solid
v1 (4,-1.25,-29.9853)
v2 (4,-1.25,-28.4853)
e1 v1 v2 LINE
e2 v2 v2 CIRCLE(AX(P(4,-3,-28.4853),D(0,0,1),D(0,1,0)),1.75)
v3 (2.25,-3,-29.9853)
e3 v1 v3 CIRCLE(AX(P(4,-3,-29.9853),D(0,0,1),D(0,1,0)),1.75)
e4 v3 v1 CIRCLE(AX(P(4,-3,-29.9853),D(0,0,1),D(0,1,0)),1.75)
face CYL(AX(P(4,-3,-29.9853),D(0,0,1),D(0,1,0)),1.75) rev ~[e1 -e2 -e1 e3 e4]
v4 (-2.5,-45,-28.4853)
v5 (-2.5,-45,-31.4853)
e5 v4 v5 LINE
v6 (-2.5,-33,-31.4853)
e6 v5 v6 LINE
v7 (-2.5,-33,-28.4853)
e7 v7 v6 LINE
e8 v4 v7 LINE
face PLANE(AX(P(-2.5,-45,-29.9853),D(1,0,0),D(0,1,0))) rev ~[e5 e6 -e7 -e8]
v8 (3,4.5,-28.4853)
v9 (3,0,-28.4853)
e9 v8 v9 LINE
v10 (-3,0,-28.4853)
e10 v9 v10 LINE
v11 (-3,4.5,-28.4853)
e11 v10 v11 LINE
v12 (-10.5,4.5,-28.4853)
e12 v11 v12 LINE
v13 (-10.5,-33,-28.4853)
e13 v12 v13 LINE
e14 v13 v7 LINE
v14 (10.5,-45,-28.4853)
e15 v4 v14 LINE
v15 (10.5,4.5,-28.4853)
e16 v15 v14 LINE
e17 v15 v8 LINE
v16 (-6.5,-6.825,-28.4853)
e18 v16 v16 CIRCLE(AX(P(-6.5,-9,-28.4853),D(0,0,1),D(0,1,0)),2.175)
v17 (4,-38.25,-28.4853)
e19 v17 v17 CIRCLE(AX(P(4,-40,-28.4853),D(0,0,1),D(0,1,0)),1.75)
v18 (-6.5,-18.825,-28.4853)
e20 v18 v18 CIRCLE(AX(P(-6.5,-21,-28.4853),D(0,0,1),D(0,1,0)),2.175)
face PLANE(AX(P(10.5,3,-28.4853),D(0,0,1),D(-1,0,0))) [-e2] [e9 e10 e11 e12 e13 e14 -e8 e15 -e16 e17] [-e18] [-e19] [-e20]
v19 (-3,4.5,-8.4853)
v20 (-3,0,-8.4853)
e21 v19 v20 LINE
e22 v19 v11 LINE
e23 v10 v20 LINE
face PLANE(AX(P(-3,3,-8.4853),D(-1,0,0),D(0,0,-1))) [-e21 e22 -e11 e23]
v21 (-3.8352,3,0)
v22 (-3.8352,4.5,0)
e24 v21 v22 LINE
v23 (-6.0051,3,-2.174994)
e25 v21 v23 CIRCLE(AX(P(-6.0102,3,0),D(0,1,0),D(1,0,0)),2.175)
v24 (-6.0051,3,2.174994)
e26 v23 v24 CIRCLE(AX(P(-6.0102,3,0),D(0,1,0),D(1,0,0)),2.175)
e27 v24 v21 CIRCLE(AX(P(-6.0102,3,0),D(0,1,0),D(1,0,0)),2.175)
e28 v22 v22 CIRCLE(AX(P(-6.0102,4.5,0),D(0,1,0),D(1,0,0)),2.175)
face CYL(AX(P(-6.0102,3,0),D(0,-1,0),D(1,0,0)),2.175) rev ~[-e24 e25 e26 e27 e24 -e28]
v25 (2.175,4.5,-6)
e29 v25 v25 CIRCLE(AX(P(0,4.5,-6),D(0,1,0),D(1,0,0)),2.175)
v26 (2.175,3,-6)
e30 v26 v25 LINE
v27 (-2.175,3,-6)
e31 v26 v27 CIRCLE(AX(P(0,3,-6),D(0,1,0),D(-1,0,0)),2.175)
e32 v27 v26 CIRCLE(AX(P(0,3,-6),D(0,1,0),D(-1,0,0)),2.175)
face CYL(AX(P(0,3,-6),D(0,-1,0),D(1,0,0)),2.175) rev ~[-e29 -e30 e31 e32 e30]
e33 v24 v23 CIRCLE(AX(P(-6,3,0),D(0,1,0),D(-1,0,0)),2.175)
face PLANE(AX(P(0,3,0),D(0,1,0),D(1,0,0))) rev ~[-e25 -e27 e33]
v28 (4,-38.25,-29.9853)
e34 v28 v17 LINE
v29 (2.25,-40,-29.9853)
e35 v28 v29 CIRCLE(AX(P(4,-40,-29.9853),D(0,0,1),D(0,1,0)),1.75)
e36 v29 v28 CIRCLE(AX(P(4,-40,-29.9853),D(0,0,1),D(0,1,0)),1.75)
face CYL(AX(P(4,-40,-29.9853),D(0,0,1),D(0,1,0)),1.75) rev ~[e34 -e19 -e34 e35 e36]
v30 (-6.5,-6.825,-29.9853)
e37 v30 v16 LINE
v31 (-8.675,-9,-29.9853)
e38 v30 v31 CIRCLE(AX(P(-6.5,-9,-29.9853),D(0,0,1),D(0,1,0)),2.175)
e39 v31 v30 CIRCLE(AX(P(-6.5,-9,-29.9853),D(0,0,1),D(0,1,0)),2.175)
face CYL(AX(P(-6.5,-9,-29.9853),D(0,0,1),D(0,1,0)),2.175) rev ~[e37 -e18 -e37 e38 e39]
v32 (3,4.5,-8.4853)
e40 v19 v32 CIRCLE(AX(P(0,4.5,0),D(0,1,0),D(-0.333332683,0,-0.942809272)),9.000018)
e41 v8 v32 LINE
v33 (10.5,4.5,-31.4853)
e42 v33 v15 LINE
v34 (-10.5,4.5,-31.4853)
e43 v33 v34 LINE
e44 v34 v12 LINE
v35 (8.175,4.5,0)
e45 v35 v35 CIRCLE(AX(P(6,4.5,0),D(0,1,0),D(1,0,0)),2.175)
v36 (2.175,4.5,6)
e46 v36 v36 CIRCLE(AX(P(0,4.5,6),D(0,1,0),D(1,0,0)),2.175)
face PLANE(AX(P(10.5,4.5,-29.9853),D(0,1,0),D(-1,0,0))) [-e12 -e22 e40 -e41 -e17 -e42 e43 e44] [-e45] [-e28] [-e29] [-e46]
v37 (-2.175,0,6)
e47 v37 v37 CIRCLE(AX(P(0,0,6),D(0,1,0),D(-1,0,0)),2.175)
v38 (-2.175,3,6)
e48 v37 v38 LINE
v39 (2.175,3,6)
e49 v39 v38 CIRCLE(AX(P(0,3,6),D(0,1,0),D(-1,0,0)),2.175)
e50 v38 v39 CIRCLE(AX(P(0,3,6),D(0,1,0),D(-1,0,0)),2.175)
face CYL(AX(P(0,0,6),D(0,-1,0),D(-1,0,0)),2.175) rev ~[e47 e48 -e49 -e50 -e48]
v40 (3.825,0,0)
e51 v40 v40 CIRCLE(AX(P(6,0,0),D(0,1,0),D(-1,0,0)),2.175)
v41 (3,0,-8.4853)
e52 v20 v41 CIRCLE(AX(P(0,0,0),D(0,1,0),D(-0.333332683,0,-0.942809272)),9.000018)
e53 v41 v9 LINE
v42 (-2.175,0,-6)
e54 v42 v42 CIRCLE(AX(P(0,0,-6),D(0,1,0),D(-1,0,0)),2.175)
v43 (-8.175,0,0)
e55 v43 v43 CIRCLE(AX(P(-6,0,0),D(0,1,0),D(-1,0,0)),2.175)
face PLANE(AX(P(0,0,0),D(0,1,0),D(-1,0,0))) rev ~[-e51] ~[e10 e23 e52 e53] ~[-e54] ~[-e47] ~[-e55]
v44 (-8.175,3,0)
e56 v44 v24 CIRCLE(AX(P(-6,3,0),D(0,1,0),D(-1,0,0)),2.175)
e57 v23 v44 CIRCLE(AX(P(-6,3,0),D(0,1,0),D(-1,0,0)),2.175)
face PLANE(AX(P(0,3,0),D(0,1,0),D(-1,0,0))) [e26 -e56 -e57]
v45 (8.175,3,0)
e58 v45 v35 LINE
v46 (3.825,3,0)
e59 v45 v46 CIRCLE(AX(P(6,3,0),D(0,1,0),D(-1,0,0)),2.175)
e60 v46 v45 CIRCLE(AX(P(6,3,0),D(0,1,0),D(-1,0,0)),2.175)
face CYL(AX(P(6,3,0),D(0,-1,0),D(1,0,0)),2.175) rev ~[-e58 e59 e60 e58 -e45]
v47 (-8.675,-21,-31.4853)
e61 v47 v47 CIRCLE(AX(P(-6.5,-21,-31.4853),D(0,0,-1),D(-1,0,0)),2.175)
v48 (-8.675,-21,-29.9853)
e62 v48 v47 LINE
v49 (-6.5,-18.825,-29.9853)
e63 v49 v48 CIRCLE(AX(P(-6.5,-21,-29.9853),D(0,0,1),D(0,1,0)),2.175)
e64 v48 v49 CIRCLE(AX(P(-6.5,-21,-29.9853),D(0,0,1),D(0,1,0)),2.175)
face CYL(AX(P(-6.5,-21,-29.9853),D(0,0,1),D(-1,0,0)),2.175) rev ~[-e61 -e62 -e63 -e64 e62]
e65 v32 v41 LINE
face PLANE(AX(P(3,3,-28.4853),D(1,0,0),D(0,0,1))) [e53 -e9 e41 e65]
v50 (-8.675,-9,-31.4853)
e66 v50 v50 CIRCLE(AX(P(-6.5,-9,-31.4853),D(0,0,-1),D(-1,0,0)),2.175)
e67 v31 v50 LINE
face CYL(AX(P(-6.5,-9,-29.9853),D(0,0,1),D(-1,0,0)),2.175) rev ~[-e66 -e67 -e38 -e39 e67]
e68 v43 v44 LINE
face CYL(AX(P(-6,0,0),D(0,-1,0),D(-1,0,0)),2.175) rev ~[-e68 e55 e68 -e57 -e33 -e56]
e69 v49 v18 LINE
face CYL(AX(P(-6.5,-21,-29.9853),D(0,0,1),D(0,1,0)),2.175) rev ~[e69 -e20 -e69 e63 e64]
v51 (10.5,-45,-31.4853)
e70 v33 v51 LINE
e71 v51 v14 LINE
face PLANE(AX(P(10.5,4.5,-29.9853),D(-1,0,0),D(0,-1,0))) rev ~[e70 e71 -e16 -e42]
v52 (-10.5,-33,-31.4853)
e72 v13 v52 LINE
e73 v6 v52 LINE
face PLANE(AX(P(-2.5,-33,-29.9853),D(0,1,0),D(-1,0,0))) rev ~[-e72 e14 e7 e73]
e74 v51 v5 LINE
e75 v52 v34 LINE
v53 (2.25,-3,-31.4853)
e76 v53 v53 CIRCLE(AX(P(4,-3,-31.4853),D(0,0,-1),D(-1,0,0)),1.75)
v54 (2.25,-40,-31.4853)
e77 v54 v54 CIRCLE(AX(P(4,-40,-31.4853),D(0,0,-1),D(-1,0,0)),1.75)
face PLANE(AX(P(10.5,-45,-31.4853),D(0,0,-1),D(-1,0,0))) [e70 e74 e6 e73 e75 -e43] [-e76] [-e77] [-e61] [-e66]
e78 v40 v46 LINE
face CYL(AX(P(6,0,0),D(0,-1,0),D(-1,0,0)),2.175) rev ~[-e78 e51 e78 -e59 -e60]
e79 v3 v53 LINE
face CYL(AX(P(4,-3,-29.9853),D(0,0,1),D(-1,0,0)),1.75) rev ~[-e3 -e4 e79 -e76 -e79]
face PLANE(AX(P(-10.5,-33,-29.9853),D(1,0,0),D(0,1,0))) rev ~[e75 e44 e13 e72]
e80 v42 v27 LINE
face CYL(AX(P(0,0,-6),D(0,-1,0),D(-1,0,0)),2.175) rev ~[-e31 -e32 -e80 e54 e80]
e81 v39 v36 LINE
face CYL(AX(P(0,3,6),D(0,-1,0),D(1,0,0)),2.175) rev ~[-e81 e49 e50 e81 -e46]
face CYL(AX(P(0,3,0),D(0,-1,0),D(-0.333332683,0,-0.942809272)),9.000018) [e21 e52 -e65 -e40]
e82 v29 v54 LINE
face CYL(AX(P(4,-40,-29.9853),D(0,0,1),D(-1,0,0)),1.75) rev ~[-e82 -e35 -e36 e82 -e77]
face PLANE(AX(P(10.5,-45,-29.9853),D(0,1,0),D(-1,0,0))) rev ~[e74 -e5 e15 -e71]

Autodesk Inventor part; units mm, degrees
ref_plane "YZ Plane" through (0, 0, 0) normal (1, 0, 0) x (0, 1, 0)
ref_plane "XZ Plane" through (0, 0, 0) normal (0, 1, 0) x (-1, 0, 0)
ref_plane "XY Plane" through (0, 0, 0) normal (0, 0, 1) x (1, 0, 0)
sketch "Sketch1" plane through (0, 0, 0) normal (0, 1, 0) x (-1, 0, 0)
  arc A0 (3, -8.4853) -> (-3, -8.4853) centre (0, 0) ccw
  circle A1 centre (6, 0) radius 2.175
  circle A2 centre (0, -6) radius 2.175
  circle A3 centre (0, 6) radius 2.175
  circle A4 centre (-6, 0) radius 2.175
  line L0 (-3, -8.4853) -> (-3, -28.4853)
  line L1 (-3, -28.4853) -> (3, -28.4853)
  line L2 (3, -28.4853) -> (3, -8.4853)
  dimension "d0" = 18
  dimension "d1" = 4.35
  dimension "d2" = 6
  dimension "d3" = 4.35
  dimension "d4" = 6
  dimension "d5" = 4.35
  dimension "d6" = 6
  dimension "d7" = 4.35
  dimension "d8" = 6
  dimension "d13" = 6
  dimension "d66" = 20
extrude "Extrusion1" add sketch "Sketch1" along normal blind 3
sketch "Sketch2" plane through (0, 3, 0) normal (0, 1, 0) x (1, 0, 0)
  line L0 (3, 28.4853) -> (-3, 28.4853) projected
  line L1 (-3, 28.4853) -> (3, 28.4853)
  line L2 (3, 28.4853) -> (3, 29.9853)
  line L3 (3, 29.9853) -> (-3, 29.9853)
  line L4 (-3, 29.9853) -> (-3, 28.4853)
  point P0 (0, 0)
  dimension "d14" = 6
  dimension "d15" = 1.5
extrude "Extrusion2" add sketch "Sketch2" against normal blind 48
sketch "Sketch3" plane through (3, 3, -29.9853) normal (0, 0, -1) x (-1, 0, 0)
  line L0 (0, -3) -> (0, -48) projected
  line L1 (0, -48) -> (-3.5, -48)
  line L2 (-3.5, -48) -> (-3.5, 0)
  line L3 (-5.175, 0) -> (-0.825, 0) projected
  line L4 (-3.5, 0) -> (0, 0)
  line L5 (0, 0) -> (0, -48)
  line L6 (0, -48) -> (6, -48) projected
  line L7 (6.825, 0) -> (11.175, 0) projected
  line L8 (6, -48) -> (9.5, -48)
  line L9 (9.5, -48) -> (9.5, 0)
  line L10 (9.5, 0) -> (6, 0)
  line L11 (6, 0) -> (6, -48)
  line L12 (9.5, 0) -> (9.5, -48)
  line L13 (-3.5, -48) -> (-7.5, -48)
  line L14 (-7.5, -48) -> (-7.5, 0)
  line L15 (-7.5, 0) -> (-3.5, 0)
  line L16 (-3.5, 0) -> (-3.5, -48)
  line L17 (9.5, -48) -> (13.5, -48)
  line L18 (13.5, -48) -> (13.5, 0)
  line L19 (13.5, 0) -> (9.5, 0)
  line L20 (9.5, 0) -> (9.5, -48)
  point P0 (3, -3)
  dimension "d18" = 3.5
  dimension "d19" = 3.5
  dimension "d43" = 4
  dimension "d44" = 4
extrude "Extrusion3" add sketch "Sketch3" against normal blind 1.5
sketch "Sketch4" plane through (6.5, -45, -29.9853) normal (0, 0, -1) x (-1, 0, 0)
  circle A0 centre (2.5, 5) radius 1.75
  line L0 (-4, 0) -> (17, 0) projected
  line L1 (17, 0) -> (-4, 0) projected
  circle A1 centre (2.5, 42) radius 1.75
  line L2 (-2.5, 45) -> (15.5, 45) projected
  line L3 (-4, 48) -> (-4, 0) projected
  point P0 (6.5, 45)
  point P1 (0, 0)
  point P2 (21, 0)
  point P3 (0, 48)
  point P4 (3.5, 45)
  point P5 (9.5, 45)
  point P6 (9.5, 0)
  point P7 (3.5, 0)
  point P8 (13, 0)
  dimension "d23" = 3.5
  dimension "d26" = 3.5
  dimension "d28" = 3
  dimension "d45" = 6.5
  dimension "d46" = 6.5
  dimension "d78" = 37
hole "Hole1" at (4, -40, -29.9853) at (4, -3, -29.9853) direction (0, 0, 1) diameter 3.5 depth 8 tip angle 118
sketch "Sketch5" plane through (6.5, -45, -29.9853) normal (0, 0, -1) x (-1, 0, 0)
  line L0 (0.0281, 45) -> (0.0281, 42)
  line L1 (0.0281, 42) -> (0.0281, 30)
  line L2 (0.0281, 30) -> (17, 30)
  line L3 (17, 48) -> (17, 0) projected
  circle A0 centre (13, 36) radius 2.175
  circle A1 centre (13, 24) radius 2.175
  dimension "d36" = 3
  dimension "d47" = 12
  dimension "d48" = 4.35
  dimension "d49" = 6
  dimension "d50" = 4
  dimension "d51" = 4.35
  dimension "d52" = 6
  dimension "d53" = 4
hole "Hole2" at (-6.5, -21, -29.9853) at (-6.5, -9, -29.9853) direction (0, 0, 1) diameter 4.35 depth 8 tip angle 118
sketch "Sketch6" plane through (10.5, -45, -29.9853) normal (0, 0, -1) x (-1, 0, 0)
  line L0 (0, 0) -> (13, 0)
  line L1 (21, 0) -> (0, 0) projected
  line L2 (13.5, 48) -> (21, 48) projected
  line L3 (13, 0) -> (13, 12)
  line L4 (12.675, 45) -> (12.675, 48) projected
  line L5 (17.25, 24) -> (29.25, 24) construction
  line L6 (21, 12) -> (17.25, 12)
  line L7 (21, 48) -> (21, 0) projected
  line L8 (21, 12) -> (21, 0)
  line L9 (21, 0) -> (13, 0)
  line L10 (13, 0) -> (13, 12)
  line L11 (13, 12) -> (21, 12)
  point P0 (10.5, 45)
  dimension "d61" = 13
extrude "Extrusion4" cut sketch "Sketch6" against normal through all
sketch "Sketch7" plane through (0, 3, 0) normal (0, 1, 0) x (1, 0, 0)
  line L0 (10.5, 29.9853) -> (-10.5, 29.9853) projected
  line L1 (-10.5, 29.9853) -> (-10.5, 28.4853) projected
  line L2 (-10.5, 29.9853) -> (-10.5, 28.4853)
  line L3 (-3, 28.4853) -> (-10.5, 28.4853) projected
  line L4 (-10.5, 28.4853) -> (-3, 28.4853)
  line L5 (-3, 8.4853) -> (-3, 28.4853) projected
  line L6 (-3, 28.4853) -> (-3, 8.4853)
  line L7 (10.5, 29.9853) -> (10.5, 28.4853) projected
  line L8 (-10.5, 29.9853) -> (10.5, 29.9853)
  line L9 (10.5, 29.9853) -> (10.5, 28.4853)
  line L10 (3, 28.4853) -> (3, 8.4853) projected
  line L11 (10.5, 28.4853) -> (3, 28.4853)
  line L12 (3, 28.4853) -> (3, 8.4853)
  arc A0 (-3, 8.4853) -> (3, 8.4853) centre (0, 0) ccw
  circle A1 centre (0, 6) radius 2.175
  circle A2 centre (-6.0102, 0) radius 2.175
  circle A3 centre (6, 0) radius 2.175
  circle A4 centre (0, -6) radius 2.175
  dimension "d67" = 4.35
  dimension "d68" = 6
  dimension "d69" = 4.35
  dimension "d70" = 6
  dimension "d71" = 4.35
  dimension "d72" = 6
extrude "Extrusion5" add sketch "Sketch7" along normal blind 1.5
sketch "Sketch8" plane through (10.5, -45, -29.9853) normal (0, 0, -1) x (-1, 0, 0)
  line L0 (13, 0) -> (13, 12) projected
  line L1 (13, -0.1664) -> (13, 12)
  line L2 (13, 12) -> (21, 12) projected
  line L3 (13, 12) -> (21, 12)
  line L4 (0, 49.5) -> (21, 49.5) projected
  line L5 (21, 12) -> (21, 49.5)
  line L6 (21, 49.5) -> (0, 49.5)
  line L7 (0, 0) -> (13, 0) projected
  line L8 (0, 49.5) -> (0, 0)
  line L9 (0, 49.5) -> (0, 0) projected
  line L10 (0, 0) -> (13, 0)
  circle A0 centre (6.5, 42) radius 1.75 projected
  circle A1 centre (6.5, 42) radius 1.75
  circle A2 centre (17, 24) radius 2.175 projected
  circle A3 centre (17, 24) radius 2.175
  circle A4 centre (17, 36) radius 2.175 projected
  circle A5 centre (17, 36) radius 2.175
  circle A6 centre (6.5, 5) radius 1.75 projected
  circle A7 centre (6.5, 5) radius 1.75
  point P0 (10.5, 45)
  dimension "d75" = 3.5
extrude "Extrusion6" add sketch "Sketch8" along normal blind 1.5
properties part number "leverServoMount"
